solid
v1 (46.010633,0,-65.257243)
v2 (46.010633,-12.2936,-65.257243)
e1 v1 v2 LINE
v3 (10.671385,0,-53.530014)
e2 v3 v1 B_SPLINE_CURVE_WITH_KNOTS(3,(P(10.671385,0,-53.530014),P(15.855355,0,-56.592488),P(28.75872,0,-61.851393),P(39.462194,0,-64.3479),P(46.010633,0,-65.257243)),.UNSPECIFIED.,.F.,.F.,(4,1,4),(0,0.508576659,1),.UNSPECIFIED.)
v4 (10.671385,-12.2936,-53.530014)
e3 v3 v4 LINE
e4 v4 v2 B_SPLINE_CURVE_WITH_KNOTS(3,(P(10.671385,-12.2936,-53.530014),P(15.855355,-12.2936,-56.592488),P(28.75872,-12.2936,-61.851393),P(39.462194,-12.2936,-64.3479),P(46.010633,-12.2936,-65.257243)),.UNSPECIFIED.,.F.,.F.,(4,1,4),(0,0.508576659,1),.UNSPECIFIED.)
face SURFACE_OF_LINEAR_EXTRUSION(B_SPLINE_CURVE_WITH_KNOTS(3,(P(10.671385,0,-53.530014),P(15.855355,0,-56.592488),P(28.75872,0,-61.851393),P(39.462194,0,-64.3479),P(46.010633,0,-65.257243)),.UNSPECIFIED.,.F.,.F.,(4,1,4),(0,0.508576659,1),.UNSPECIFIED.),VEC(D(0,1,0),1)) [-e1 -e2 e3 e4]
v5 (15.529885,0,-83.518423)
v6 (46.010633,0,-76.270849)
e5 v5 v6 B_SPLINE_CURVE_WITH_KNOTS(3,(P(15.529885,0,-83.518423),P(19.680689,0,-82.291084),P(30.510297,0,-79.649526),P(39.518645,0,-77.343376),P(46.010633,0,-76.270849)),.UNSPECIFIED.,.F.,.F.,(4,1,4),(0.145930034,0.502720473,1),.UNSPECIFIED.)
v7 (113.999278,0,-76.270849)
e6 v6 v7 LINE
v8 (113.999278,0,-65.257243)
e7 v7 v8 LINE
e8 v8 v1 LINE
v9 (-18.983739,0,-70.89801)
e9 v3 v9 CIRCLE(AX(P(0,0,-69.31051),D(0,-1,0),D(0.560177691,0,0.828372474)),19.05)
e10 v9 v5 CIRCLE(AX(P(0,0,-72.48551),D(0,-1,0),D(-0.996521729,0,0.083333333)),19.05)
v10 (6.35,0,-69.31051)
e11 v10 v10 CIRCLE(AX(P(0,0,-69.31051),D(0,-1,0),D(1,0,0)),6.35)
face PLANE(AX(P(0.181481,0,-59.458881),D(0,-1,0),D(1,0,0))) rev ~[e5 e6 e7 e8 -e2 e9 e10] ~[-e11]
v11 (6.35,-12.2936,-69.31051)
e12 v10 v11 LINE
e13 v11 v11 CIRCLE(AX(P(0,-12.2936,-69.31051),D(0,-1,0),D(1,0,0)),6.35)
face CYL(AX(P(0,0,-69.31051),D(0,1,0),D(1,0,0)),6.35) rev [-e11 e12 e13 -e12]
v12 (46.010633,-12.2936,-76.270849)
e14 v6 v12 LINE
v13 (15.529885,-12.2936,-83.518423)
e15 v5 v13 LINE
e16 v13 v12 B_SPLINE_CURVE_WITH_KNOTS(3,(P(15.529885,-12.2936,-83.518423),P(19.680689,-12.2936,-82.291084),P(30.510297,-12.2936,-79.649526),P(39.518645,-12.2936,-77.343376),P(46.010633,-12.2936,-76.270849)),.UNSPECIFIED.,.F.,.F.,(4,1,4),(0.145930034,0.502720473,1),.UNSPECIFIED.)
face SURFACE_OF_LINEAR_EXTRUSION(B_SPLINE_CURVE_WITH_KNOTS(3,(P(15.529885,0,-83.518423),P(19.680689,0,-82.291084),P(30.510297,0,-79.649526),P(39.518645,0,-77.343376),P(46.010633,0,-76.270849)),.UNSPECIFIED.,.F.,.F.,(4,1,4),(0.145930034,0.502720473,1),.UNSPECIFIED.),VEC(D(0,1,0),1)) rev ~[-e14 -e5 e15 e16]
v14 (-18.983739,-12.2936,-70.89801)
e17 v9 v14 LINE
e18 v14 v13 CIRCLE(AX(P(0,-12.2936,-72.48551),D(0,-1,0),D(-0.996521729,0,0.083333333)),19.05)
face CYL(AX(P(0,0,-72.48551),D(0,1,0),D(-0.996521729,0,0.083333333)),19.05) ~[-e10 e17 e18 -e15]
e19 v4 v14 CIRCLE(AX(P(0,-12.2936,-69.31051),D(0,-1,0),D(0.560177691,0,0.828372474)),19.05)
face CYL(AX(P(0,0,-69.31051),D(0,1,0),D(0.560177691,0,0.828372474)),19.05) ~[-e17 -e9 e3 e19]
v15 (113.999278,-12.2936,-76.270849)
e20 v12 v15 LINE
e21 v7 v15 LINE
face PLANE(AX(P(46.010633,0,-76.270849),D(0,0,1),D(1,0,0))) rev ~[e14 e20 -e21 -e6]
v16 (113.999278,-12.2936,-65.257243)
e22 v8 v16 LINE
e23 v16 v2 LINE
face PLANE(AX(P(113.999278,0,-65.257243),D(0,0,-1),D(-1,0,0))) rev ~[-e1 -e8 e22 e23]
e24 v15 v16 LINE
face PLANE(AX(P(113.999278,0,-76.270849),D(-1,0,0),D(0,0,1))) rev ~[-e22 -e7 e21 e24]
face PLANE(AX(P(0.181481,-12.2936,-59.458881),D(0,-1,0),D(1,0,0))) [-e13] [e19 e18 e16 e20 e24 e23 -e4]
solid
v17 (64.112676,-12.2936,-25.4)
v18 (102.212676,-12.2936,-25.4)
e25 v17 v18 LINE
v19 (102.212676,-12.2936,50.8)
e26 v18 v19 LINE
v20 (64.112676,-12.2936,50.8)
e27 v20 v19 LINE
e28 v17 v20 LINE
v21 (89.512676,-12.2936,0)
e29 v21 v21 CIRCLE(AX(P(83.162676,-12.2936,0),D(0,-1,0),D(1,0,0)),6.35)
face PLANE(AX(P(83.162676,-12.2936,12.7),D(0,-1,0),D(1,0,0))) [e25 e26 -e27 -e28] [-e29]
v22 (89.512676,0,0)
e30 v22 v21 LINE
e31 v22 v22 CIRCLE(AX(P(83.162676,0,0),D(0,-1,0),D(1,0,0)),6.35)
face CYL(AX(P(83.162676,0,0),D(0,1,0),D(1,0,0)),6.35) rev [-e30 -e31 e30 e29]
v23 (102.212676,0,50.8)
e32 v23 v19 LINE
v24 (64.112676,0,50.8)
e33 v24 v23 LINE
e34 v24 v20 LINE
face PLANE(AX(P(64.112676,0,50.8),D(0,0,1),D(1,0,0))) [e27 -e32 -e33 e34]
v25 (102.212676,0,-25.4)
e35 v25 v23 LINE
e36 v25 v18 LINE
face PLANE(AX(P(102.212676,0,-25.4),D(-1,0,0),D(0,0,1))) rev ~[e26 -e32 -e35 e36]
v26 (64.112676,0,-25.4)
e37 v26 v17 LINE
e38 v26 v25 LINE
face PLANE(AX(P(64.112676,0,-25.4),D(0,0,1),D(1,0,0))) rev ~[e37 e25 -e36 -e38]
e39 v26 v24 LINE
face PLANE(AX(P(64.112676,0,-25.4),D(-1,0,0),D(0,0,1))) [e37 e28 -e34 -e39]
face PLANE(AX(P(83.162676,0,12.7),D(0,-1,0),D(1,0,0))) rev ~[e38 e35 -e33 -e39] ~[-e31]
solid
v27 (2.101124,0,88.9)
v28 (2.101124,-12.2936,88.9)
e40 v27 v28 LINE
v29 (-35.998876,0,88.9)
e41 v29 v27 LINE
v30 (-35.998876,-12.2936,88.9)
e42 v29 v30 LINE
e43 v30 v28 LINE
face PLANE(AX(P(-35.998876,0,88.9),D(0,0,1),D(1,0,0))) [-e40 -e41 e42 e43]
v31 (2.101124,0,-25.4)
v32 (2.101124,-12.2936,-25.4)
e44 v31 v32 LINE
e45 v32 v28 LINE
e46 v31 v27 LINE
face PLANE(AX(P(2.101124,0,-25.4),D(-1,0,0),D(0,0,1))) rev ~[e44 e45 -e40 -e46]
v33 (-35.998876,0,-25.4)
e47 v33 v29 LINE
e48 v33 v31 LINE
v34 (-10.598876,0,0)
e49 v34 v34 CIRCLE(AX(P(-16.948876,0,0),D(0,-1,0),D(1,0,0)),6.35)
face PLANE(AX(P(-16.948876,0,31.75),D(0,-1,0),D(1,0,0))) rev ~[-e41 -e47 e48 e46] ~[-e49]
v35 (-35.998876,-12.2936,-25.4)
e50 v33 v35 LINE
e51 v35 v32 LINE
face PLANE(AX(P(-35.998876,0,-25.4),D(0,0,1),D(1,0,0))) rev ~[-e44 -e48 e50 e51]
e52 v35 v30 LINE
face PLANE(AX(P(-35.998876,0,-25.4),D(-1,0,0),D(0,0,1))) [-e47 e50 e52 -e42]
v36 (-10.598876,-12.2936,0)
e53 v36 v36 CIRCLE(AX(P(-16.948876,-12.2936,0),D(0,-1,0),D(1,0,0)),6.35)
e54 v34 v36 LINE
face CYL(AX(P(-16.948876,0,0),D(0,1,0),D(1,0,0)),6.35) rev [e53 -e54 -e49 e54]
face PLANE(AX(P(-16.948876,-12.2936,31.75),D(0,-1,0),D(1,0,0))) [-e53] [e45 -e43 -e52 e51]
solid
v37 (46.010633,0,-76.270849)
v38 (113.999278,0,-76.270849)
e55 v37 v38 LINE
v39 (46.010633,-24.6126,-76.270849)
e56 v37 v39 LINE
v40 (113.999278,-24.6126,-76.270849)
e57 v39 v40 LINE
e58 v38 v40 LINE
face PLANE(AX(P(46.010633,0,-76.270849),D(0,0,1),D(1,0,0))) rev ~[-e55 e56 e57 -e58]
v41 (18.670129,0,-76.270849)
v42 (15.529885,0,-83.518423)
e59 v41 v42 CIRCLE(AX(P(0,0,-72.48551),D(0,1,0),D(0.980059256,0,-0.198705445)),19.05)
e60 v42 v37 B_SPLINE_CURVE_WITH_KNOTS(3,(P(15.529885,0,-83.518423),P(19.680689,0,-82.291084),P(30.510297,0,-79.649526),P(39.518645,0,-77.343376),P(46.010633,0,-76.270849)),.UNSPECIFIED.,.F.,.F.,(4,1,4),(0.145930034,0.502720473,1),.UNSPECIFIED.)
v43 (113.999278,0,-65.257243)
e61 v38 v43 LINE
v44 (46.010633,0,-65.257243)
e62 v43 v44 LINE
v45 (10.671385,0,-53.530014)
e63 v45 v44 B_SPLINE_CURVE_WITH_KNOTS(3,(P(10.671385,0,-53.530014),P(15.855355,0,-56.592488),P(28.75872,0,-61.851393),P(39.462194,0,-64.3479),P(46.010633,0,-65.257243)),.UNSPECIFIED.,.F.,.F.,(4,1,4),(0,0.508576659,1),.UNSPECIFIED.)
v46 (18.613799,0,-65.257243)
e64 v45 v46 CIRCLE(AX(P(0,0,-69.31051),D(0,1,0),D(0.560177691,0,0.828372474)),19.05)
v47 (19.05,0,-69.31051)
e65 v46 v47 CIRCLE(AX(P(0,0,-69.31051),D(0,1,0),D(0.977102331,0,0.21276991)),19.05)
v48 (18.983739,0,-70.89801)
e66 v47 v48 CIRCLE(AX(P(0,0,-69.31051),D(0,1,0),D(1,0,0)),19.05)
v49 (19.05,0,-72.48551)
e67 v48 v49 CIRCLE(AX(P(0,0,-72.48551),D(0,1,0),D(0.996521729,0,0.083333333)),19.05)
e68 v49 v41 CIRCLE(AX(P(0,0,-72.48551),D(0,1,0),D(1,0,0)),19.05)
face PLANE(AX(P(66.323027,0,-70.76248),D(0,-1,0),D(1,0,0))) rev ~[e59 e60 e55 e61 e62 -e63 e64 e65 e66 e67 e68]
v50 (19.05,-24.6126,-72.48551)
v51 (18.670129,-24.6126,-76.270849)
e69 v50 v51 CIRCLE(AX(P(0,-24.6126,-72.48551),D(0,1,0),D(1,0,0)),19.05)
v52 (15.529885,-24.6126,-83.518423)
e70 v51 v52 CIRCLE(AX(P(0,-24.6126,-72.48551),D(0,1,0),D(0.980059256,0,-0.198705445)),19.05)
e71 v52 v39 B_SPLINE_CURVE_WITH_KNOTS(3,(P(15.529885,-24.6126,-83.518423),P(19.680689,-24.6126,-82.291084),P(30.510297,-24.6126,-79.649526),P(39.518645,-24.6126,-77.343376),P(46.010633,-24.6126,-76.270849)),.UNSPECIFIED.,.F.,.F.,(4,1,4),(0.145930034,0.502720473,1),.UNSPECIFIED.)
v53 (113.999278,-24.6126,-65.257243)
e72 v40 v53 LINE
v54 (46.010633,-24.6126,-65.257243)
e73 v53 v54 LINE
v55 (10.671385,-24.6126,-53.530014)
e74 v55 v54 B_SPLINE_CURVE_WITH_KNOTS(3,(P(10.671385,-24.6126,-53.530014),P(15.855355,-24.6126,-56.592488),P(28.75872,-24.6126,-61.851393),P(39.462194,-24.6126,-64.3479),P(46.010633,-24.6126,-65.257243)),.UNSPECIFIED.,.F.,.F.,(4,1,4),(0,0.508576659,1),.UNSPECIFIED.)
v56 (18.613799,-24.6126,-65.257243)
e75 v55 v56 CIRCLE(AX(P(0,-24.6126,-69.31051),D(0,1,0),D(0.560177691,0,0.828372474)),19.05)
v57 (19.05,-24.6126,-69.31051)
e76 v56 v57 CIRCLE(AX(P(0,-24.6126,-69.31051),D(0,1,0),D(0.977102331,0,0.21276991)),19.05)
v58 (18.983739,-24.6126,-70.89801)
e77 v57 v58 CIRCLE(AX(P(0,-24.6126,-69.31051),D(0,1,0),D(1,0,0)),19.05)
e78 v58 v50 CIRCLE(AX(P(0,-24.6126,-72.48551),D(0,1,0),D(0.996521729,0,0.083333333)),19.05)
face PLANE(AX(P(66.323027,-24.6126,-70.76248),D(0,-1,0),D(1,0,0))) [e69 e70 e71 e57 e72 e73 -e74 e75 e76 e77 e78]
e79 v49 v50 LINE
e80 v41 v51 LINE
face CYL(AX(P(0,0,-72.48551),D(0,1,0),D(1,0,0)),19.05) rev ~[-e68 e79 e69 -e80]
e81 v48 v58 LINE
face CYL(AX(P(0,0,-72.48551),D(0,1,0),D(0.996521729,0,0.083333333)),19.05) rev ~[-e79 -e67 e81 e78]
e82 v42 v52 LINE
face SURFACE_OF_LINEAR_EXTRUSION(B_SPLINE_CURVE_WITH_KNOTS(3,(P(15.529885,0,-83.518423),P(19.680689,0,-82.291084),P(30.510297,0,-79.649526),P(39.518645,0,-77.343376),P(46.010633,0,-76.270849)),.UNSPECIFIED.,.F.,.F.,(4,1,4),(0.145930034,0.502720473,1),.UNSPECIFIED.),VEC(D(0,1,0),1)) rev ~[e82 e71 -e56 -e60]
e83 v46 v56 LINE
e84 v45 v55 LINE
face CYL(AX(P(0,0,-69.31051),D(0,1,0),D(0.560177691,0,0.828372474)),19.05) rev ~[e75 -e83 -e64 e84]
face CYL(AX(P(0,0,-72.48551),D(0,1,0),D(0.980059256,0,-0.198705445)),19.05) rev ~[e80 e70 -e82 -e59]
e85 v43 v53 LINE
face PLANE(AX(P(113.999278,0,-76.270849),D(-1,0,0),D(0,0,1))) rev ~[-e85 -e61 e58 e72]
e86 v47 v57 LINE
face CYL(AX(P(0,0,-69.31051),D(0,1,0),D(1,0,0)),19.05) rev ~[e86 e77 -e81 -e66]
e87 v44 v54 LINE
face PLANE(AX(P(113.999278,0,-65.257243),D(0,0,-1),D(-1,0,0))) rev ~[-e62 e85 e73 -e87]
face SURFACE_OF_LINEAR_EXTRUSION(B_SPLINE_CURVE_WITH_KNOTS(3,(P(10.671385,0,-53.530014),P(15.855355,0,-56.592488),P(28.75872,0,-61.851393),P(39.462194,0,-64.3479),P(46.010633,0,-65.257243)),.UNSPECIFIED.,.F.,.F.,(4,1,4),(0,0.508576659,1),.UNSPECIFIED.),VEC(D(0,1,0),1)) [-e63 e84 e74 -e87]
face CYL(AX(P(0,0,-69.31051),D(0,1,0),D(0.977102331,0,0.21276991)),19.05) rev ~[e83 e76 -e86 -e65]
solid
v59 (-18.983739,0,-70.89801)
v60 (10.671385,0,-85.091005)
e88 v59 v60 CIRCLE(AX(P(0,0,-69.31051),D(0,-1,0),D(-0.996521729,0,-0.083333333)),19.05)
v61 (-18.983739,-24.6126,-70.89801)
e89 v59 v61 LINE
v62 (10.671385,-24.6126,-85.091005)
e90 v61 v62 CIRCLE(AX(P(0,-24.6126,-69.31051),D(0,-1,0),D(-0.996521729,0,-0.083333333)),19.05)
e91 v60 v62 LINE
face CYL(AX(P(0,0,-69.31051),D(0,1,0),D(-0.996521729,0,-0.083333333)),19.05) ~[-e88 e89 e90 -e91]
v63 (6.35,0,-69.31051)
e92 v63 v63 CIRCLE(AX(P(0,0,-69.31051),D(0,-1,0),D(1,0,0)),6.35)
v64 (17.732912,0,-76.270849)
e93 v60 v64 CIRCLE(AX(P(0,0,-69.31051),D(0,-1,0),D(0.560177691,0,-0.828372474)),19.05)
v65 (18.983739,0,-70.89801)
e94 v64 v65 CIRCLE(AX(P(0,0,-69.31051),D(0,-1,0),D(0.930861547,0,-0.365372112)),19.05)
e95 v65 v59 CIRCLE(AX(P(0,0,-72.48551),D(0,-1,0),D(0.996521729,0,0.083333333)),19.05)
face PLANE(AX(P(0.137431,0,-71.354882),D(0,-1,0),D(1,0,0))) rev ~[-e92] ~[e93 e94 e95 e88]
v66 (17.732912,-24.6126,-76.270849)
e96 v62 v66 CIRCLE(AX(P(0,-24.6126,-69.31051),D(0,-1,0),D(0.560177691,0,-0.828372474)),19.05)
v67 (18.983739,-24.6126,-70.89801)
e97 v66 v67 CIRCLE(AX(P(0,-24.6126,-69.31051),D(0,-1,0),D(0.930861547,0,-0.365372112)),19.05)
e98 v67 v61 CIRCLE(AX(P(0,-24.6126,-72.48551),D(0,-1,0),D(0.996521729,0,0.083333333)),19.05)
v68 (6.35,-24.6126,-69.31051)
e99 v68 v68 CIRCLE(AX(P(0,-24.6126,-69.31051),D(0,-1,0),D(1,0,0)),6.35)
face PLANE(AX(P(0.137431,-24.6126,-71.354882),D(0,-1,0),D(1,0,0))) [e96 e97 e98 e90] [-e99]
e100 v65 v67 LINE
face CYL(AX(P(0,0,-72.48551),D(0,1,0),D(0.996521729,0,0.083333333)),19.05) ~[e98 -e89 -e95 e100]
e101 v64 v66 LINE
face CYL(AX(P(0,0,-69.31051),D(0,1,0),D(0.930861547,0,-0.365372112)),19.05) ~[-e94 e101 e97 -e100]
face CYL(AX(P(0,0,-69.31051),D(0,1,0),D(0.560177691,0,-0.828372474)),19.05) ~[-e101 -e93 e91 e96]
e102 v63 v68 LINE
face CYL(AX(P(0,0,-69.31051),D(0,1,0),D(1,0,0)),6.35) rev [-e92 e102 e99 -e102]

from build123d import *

# Parameters (mm, degrees)
F0_W     = 38.1
F0_H     = 114.3
F0_R     = 6.35
F1_DEPTH = 12.2936
F0_H_2   = 76.2
F2_DEPTH = 24.6126


with BuildPart() as f1:
    # F0 (on Front) → F1 (new body)
    with BuildSketch(Plane.XZ):
        with Locations((-16.9488759977, 31.75)):
            Rectangle(F0_W, F0_H)
        with Locations((-16.9488759977, 0)):
            Circle(F0_R, mode=Mode.SUBTRACT)
    extrude(amount=F1_DEPTH)


with BuildPart() as f1b:
    # F0 (on Front) → F1, piece 2 (new body)
    with BuildSketch(Plane.XZ):
        with Locations((83.1626755297, 12.7)):
            Rectangle(F0_W, F0_H_2)
        with Locations((83.1626755297, 0)):
            Circle(F0_R, mode=Mode.SUBTRACT)
    extrude(amount=F1_DEPTH)


with BuildPart() as f1c:
    # F0 (on Front) → F1, piece 3 (new body)
    with BuildSketch(Plane.XZ):
        with BuildLine():
            ThreePointArc((18.9837389297, -70.8980097773), (19.0334275238, -70.1049508984), (19.05, -69.3105097773))
            ThreePointArc((19.05, -69.3105097773), (18.9406359278, -67.2721745126), (18.6137994067, -65.2572429901))
            ThreePointArc((18.6137994067, -65.2572429901), (15.7729984646, -58.6280466047), (10.6713850071, -53.5300141568))
            ThreePointArc((10.6713850071, -53.5300141568), (-9.6273373734, -52.8722350778), (-18.9837389297, -70.8980097773))
            ThreePointArc((-18.9837389297, -70.8980097773), (0, -53.4355097773), (18.9837389297, -70.8980097773))
        make_face()
        with BuildLine():
            ThreePointArc((17.7329124706, -76.2708485126), (18.5538398056, -73.6299459059), (18.9837389297, -70.8980097773))
            ThreePointArc((18.9837389297, -70.8980097773), (0, -53.4355097773), (-18.9837389297, -70.8980097773))
            ThreePointArc((-18.9837389297, -70.8980097773), (-8.2239946562, -86.4938858104), (10.6713850071, -85.0910053979))
            ThreePointArc((10.6713850071, -85.0910053979), (14.871106908, -81.2165031978), (17.7329124706, -76.2708485126))
        make_face()
        with Locations((0, -69.3105097773)):
            Circle(F0_R, mode=Mode.SUBTRACT)
        with BuildLine():
            Line((18.6701288335, -76.2708485126), (17.7329124706, -76.2708485126))
            ThreePointArc((17.7329124706, -76.2708485126), (14.871106908, -81.2165031978), (10.6713850071, -85.0910053979))
            add(Edge.make_bspline(
                [(10.6713850071, -85.0910053979), (12.1969107154, -84.5431198491), (13.8321735998, -84.0204148681), (15.529884584, -83.5184234817)],
                knots=[0, 0, 0, 0, 0.1459300345, 0.1459300345, 0.1459300345, 0.1459300345], degree=3))
            ThreePointArc((15.529884584, -83.5184234817), (17.479761588, -80.0591769754), (18.6701288335, -76.2708485126))
        make_face()
        with BuildLine():
            ThreePointArc((10.6713850071, -85.0910053979), (-8.2239946562, -86.4938858104), (-18.9837389297, -70.8980097773))
            ThreePointArc((-18.9837389297, -70.8980097773), (-6.5422464015, -90.3768907196), (15.529884584, -83.5184234817))
            add(Edge.make_bspline(
                [(10.6713850071, -85.0910053979), (12.1969107154, -84.5431198491), (13.8321735998, -84.0204148681), (15.529884584, -83.5184234817)],
                knots=[0, 0, 0, 0, 0.1459300345, 0.1459300345, 0.1459300345, 0.1459300345], degree=3))
        make_face()
        with BuildLine():
            ThreePointArc((19.05, -72.4855097773), (19.0334275238, -71.6910686563), (18.9837389297, -70.8980097773))
            ThreePointArc((18.9837389297, -70.8980097773), (18.5538398056, -73.6299459059), (17.7329124706, -76.2708485126))
            Line((17.7329124706, -76.2708485126), (18.6701288335, -76.2708485126))
            ThreePointArc((18.6701288335, -76.2708485126), (18.9547943048, -74.3876856002), (19.05, -72.4855097773))
        make_face()
        with BuildLine():
            ThreePointArc((10.6713850071, -53.5300141568), (15.7729984646, -58.6280466047), (18.6137994067, -65.2572429901))
            Line((18.6137994067, -65.2572429901), (46.010632673, -65.2572429901))
            add(Edge.make_bspline(
                [(10.6713850071, -53.5300141568), (15.855355067, -56.5924877327), (28.7587196398, -61.8513925035), (39.4621942281, -64.3479001906), (46.010632673, -65.2572429901)],
                knots=[0, 0, 0, 0, 0.5085766586, 1, 1, 1, 1], degree=3))
        make_face()
        with BuildLine():
            ThreePointArc((18.6137994067, -65.2572429901), (18.9406359278, -67.2721745126), (19.05, -69.3105097773))
            ThreePointArc((19.05, -69.3105097773), (19.0334275238, -70.1049508984), (18.9837389297, -70.8980097773))
            ThreePointArc((18.9837389297, -70.8980097773), (19.0334275238, -71.6910686563), (19.05, -72.4855097773))
            ThreePointArc((19.05, -72.4855097773), (18.9547943048, -74.3876856002), (18.6701288335, -76.2708485126))
            Line((18.6701288335, -76.2708485126), (46.010632673, -76.2708485126))
            Line((46.010632673, -76.2708485126), (113.9992779968, -76.2708485126))
            Line((113.9992779968, -76.2708485126), (113.9992779968, -65.2572429901))
            Line((113.9992779968, -65.2572429901), (46.010632673, -65.2572429901))
            Line((46.010632673, -65.2572429901), (18.6137994067, -65.2572429901))
        make_face()
        with BuildLine():
            Line((46.010632673, -76.2708485126), (18.6701288335, -76.2708485126))
            ThreePointArc((18.6701288335, -76.2708485126), (17.479761588, -80.0591769754), (15.529884584, -83.5184234817))
            add(Edge.make_bspline(
                [(15.529884584, -83.5184234817), (19.680689102, -82.291083767), (30.5102969423, -79.6495257935), (39.5186451666, -77.343375938), (46.010632673, -76.2708485126)],
                knots=[0.1459300345, 0.1459300345, 0.1459300345, 0.1459300345, 0.5027204729, 1, 1, 1, 1], degree=3))
        make_face()
    extrude(amount=F1_DEPTH)


with BuildPart() as f2:
    # F0 (on Front) → F2 (new body)
    with BuildSketch(Plane.XZ):
        with BuildLine():
            ThreePointArc((18.6137994067, -65.2572429901), (18.9406359278, -67.2721745126), (19.05, -69.3105097773))
            ThreePointArc((19.05, -69.3105097773), (19.0334275238, -70.1049508984), (18.9837389297, -70.8980097773))
            ThreePointArc((18.9837389297, -70.8980097773), (19.0334275238, -71.6910686563), (19.05, -72.4855097773))
            ThreePointArc((19.05, -72.4855097773), (18.9547943048, -74.3876856002), (18.6701288335, -76.2708485126))
            Line((18.6701288335, -76.2708485126), (46.010632673, -76.2708485126))
            Line((46.010632673, -76.2708485126), (113.9992779968, -76.2708485126))
            Line((113.9992779968, -76.2708485126), (113.9992779968, -65.2572429901))
            Line((113.9992779968, -65.2572429901), (46.010632673, -65.2572429901))
            Line((46.010632673, -65.2572429901), (18.6137994067, -65.2572429901))
        make_face()
        with BuildLine():
            ThreePointArc((10.6713850071, -53.5300141568), (15.7729984646, -58.6280466047), (18.6137994067, -65.2572429901))
            Line((18.6137994067, -65.2572429901), (46.010632673, -65.2572429901))
            add(Edge.make_bspline(
                [(10.6713850071, -53.5300141568), (15.855355067, -56.5924877327), (28.7587196398, -61.8513925035), (39.4621942281, -64.3479001906), (46.010632673, -65.2572429901)],
                knots=[0, 0, 0, 0, 0.5085766586, 1, 1, 1, 1], degree=3))
        make_face()
        with BuildLine():
            Line((46.010632673, -76.2708485126), (18.6701288335, -76.2708485126))
            ThreePointArc((18.6701288335, -76.2708485126), (17.479761588, -80.0591769754), (15.529884584, -83.5184234817))
            add(Edge.make_bspline(
                [(15.529884584, -83.5184234817), (19.680689102, -82.291083767), (30.5102969423, -79.6495257935), (39.5186451666, -77.343375938), (46.010632673, -76.2708485126)],
                knots=[0.1459300345, 0.1459300345, 0.1459300345, 0.1459300345, 0.5027204729, 1, 1, 1, 1], degree=3))
        make_face()
    extrude(amount=F2_DEPTH)


with BuildPart() as f2b:
    # F0 (on Front) → F2, piece 2 (new body)
    with BuildSketch(Plane.XZ):
        with BuildLine():
            ThreePointArc((17.7329124706, -76.2708485126), (18.5538398056, -73.6299459059), (18.9837389297, -70.8980097773))
            ThreePointArc((18.9837389297, -70.8980097773), (0, -53.4355097773), (-18.9837389297, -70.8980097773))
            ThreePointArc((-18.9837389297, -70.8980097773), (-8.2239946562, -86.4938858104), (10.6713850071, -85.0910053979))
            ThreePointArc((10.6713850071, -85.0910053979), (14.871106908, -81.2165031978), (17.7329124706, -76.2708485126))
        make_face()
        with Locations((0, -69.3105097773)):
            Circle(F0_R, mode=Mode.SUBTRACT)
    extrude(amount=F2_DEPTH)


solid = Compound([f1.part, f1b.part, f1c.part, f2.part, f2b.part])
